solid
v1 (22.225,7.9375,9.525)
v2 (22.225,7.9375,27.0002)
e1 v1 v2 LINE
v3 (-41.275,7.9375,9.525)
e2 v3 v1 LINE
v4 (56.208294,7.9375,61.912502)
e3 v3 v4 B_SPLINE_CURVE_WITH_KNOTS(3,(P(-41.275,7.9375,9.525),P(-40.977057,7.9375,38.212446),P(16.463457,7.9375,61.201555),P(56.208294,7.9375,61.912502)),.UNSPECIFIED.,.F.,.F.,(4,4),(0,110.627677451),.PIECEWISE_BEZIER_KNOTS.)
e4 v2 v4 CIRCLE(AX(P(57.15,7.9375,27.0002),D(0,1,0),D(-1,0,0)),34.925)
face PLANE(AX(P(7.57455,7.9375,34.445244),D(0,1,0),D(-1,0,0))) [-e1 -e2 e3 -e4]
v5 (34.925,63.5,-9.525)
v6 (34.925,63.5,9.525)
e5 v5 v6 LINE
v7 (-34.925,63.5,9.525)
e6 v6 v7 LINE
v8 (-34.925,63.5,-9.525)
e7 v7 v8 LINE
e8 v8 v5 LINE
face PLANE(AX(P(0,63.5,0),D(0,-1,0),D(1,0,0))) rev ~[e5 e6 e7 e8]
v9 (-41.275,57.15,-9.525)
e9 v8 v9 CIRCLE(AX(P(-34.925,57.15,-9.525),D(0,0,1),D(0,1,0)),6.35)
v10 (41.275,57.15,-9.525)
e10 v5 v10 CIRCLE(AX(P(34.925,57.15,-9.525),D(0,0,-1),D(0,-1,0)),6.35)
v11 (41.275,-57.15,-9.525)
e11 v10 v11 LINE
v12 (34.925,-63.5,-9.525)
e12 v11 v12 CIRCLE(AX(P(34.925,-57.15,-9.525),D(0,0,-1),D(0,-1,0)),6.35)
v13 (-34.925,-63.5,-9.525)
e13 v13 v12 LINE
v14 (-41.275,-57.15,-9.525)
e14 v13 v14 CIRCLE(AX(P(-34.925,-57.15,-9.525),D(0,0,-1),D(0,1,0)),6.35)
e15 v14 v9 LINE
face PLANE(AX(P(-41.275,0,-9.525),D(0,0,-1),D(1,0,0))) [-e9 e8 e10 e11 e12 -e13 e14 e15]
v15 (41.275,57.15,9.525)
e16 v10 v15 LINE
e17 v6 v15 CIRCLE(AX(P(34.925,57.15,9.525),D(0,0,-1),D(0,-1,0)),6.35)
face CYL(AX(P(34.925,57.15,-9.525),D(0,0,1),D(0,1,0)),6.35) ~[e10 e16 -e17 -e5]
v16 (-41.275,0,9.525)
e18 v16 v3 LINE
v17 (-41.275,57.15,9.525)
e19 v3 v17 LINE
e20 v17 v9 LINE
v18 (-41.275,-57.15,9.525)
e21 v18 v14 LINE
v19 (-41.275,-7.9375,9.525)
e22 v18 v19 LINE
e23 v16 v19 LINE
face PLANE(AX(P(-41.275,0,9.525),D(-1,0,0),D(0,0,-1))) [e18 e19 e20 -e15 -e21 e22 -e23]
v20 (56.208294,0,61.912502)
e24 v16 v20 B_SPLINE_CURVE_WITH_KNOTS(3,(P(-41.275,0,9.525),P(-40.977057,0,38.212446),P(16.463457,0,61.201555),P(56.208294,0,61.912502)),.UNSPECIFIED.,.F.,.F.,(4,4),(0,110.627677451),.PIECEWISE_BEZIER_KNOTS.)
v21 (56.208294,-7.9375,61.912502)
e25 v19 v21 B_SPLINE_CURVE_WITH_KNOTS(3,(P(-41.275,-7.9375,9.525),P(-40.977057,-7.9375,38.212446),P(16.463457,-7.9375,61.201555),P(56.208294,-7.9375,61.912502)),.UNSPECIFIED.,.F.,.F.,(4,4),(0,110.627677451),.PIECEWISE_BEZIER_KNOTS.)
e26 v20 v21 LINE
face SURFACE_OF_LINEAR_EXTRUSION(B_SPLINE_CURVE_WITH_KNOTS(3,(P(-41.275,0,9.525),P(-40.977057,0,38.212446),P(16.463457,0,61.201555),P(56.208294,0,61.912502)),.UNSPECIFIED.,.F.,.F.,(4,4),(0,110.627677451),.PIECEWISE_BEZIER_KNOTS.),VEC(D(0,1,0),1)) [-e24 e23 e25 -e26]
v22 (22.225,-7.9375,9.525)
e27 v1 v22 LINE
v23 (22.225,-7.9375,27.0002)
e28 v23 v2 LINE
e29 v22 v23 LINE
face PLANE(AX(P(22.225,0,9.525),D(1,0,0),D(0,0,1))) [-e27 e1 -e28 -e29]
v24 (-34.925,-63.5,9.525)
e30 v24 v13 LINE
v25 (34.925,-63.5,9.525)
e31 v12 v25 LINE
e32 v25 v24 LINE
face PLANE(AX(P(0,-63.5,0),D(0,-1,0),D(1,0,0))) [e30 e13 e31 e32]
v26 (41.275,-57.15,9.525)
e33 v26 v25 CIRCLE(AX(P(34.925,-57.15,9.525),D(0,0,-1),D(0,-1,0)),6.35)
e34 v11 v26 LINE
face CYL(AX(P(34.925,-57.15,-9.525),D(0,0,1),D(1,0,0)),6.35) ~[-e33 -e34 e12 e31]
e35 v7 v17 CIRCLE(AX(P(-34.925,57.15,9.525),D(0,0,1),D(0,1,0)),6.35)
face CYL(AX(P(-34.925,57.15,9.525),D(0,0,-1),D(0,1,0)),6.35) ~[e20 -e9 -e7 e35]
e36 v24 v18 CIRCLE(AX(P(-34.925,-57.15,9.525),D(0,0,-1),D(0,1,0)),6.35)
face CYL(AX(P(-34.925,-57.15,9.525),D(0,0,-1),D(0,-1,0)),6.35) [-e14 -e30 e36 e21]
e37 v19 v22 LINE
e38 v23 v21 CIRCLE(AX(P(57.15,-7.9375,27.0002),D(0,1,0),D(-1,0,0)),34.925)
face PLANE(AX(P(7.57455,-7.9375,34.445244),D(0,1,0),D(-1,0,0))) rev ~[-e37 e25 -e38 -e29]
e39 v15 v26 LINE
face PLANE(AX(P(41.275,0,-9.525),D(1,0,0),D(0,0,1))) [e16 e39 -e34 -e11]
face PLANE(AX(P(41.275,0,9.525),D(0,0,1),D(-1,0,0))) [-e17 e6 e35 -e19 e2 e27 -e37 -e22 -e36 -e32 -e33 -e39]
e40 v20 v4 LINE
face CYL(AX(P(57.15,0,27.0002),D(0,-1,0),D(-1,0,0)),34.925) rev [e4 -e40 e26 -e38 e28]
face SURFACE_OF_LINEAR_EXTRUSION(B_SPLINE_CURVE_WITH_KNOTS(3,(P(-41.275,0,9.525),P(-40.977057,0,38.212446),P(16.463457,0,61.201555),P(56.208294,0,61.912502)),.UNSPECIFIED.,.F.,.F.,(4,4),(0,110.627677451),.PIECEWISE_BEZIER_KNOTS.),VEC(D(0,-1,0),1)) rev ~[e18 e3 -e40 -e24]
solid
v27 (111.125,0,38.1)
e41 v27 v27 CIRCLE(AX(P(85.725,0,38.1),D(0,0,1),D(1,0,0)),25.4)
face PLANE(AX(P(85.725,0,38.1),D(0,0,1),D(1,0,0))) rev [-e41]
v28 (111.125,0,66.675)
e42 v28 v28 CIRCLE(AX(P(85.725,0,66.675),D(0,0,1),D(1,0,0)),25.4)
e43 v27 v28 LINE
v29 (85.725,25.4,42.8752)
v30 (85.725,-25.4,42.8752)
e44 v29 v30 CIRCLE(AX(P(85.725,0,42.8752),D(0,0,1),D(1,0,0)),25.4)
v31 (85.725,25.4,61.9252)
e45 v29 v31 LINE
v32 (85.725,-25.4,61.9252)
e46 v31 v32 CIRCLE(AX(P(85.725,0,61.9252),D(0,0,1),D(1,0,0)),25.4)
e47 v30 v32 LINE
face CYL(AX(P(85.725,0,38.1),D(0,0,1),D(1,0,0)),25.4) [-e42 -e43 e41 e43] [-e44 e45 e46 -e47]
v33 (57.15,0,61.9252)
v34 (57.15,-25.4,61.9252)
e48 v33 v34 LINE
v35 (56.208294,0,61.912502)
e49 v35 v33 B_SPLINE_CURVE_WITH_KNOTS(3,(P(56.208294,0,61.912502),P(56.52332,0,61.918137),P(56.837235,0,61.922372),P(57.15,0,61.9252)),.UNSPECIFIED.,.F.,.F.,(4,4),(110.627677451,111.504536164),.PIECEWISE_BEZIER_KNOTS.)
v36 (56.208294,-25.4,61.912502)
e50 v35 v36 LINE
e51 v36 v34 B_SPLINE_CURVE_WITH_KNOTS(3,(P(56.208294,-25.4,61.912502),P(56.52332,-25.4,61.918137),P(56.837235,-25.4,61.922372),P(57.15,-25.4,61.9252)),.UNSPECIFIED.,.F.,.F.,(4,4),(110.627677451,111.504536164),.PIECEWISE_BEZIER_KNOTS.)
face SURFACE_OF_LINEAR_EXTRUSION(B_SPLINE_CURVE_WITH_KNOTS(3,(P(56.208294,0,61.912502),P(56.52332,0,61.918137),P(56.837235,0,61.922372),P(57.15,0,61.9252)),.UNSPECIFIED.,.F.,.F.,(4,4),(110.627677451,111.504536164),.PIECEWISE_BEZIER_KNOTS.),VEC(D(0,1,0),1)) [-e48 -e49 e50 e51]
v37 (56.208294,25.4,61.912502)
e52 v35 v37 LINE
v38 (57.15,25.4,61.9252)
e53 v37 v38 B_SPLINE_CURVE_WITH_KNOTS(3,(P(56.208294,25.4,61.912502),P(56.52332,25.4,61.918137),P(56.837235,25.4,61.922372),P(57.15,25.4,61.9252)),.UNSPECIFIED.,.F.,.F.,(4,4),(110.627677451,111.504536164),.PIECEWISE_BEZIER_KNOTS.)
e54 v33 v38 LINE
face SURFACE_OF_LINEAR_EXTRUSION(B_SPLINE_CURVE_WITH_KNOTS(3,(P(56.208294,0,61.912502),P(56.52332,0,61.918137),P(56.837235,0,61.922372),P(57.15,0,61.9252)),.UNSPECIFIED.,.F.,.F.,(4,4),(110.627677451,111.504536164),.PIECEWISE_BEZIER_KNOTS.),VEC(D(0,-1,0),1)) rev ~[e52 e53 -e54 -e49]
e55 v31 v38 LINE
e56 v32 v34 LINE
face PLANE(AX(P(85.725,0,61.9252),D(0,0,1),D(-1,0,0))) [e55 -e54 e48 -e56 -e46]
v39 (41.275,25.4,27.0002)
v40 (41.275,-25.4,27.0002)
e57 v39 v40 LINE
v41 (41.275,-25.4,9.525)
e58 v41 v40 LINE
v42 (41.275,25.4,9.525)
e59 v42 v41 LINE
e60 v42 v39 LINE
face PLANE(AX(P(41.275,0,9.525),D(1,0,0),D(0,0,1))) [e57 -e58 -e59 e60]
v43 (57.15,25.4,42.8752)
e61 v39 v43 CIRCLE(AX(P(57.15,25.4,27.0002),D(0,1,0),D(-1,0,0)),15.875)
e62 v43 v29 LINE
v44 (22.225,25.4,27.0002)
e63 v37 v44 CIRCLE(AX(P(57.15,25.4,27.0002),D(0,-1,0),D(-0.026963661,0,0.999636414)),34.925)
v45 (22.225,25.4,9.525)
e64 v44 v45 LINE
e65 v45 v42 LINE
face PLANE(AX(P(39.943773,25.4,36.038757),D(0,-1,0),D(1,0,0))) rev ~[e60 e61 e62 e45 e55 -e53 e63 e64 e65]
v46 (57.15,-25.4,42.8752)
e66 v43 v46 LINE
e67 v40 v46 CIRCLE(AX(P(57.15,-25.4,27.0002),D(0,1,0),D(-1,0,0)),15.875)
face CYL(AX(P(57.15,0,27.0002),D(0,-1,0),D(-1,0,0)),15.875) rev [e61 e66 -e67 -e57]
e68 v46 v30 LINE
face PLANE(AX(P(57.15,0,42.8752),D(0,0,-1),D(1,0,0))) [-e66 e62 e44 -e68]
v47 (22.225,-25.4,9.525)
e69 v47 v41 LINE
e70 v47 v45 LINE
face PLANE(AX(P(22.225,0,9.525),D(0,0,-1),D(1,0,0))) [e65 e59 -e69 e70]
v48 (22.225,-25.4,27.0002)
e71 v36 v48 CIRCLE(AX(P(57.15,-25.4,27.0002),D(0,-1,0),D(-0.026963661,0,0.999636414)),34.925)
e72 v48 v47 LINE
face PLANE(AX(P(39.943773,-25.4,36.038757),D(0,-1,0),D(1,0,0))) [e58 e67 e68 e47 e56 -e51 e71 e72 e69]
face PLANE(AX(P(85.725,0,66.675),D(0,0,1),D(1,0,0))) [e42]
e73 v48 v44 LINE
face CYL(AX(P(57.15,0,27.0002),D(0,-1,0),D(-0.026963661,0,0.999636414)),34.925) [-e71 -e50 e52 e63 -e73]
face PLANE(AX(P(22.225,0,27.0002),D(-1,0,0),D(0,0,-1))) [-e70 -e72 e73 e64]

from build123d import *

# Parameters (mm, degrees)
F1_DEPTH = 63.5
F0_W     = 25.4
F0_H     = 19.05
F2_DEPTH = 25.4
F3_DEPTH = 7.9375
F5_R     = 6.35


with BuildPart() as f1:
    # F0 (on Front) → F1 (new body, symmetric)
    with BuildSketch(Plane.XZ):
        Polygon((-41.275, -9.525), (41.275, -9.525), (41.275, 9.525), (22.225, 9.525), (-41.275, 9.525), align=None)
    extrude(amount=F1_DEPTH, both=True)

    # F0 (on Front) → F3 (join, symmetric)
    with BuildSketch(Plane.XZ):
        with BuildLine():
            add(Edge.make_bspline(
                [(-41.275, 9.525), (-40.9770567973, 38.2124460487), (16.4634570461, 61.2015549145), (56.2082941288, 61.9125017725)],
                knots=[0, 0, 0, 0, 110.6276774511, 110.6276774511, 110.6276774511, 110.6276774511], degree=3))
            Line((-41.275, 9.525), (22.225, 9.525))
            Line((22.225, 9.525), (22.225, 27.0002))
            ThreePointArc((22.225, 27.0002), (32.1235669486, 51.360685909), (56.2082941288, 61.9125017725))
        make_face()
    extrude(amount=F3_DEPTH, both=True)

    # F5
    f5_edges = [f1.edges().sort_by_distance(p)[0] for p in [
        (41.275, -63.5, 0),
        (-41.275, -63.5, 0),
        (41.275, 63.5, 0),
        (-41.275, 63.5, 0),
    ]]
    fillet(f5_edges, radius=F5_R)


with BuildPart() as f2:
    # F0 (on Front) → F2 (new body, symmetric)
    with BuildSketch(Plane.XZ):
        with BuildLine():
            Line((22.225, 9.525), (41.275, 9.525))
            Line((41.275, 9.525), (41.275, 27.0002))
            ThreePointArc((41.275, 27.0002), (45.9246798487, 38.2255201513), (57.15, 42.8752))
            Line((57.15, 42.8752), (60.325, 42.8752))
            Line((60.325, 42.8752), (60.325, 61.9252))
            Line((60.325, 61.9252), (57.15, 61.9252))
            add(Edge.make_bspline(
                [(56.2082941288, 61.9125017725), (56.5233202368, 61.9181368898), (56.8372346161, 61.9223723844), (57.15, 61.9252)],
                knots=[110.6276774511, 110.6276774511, 110.6276774511, 110.6276774511, 111.5045361635, 111.5045361635, 111.5045361635, 111.5045361635], degree=3))
            ThreePointArc((56.2082941288, 61.9125017725), (32.1235669486, 51.360685909), (22.225, 27.0002))
            Line((22.225, 27.0002), (22.225, 9.525))
        make_face()
        with Locations((73.025, 52.4002)):
            Rectangle(F0_W, F0_H)
    extrude(amount=F2_DEPTH, both=True)

    # F0 (on Front) → F4 (revolve)
    with BuildSketch(Plane.XZ):
        Polygon((85.725, 61.9252), (85.725, 42.8752), (85.725, 38.1), (111.125, 38.1), (111.125, 66.675), (85.725, 66.675), align=None)
    revolve(axis=Axis((85.725, 0, 52.3875), (0, 0, 1)))


solid = Compound([f1.part, f2.part])
